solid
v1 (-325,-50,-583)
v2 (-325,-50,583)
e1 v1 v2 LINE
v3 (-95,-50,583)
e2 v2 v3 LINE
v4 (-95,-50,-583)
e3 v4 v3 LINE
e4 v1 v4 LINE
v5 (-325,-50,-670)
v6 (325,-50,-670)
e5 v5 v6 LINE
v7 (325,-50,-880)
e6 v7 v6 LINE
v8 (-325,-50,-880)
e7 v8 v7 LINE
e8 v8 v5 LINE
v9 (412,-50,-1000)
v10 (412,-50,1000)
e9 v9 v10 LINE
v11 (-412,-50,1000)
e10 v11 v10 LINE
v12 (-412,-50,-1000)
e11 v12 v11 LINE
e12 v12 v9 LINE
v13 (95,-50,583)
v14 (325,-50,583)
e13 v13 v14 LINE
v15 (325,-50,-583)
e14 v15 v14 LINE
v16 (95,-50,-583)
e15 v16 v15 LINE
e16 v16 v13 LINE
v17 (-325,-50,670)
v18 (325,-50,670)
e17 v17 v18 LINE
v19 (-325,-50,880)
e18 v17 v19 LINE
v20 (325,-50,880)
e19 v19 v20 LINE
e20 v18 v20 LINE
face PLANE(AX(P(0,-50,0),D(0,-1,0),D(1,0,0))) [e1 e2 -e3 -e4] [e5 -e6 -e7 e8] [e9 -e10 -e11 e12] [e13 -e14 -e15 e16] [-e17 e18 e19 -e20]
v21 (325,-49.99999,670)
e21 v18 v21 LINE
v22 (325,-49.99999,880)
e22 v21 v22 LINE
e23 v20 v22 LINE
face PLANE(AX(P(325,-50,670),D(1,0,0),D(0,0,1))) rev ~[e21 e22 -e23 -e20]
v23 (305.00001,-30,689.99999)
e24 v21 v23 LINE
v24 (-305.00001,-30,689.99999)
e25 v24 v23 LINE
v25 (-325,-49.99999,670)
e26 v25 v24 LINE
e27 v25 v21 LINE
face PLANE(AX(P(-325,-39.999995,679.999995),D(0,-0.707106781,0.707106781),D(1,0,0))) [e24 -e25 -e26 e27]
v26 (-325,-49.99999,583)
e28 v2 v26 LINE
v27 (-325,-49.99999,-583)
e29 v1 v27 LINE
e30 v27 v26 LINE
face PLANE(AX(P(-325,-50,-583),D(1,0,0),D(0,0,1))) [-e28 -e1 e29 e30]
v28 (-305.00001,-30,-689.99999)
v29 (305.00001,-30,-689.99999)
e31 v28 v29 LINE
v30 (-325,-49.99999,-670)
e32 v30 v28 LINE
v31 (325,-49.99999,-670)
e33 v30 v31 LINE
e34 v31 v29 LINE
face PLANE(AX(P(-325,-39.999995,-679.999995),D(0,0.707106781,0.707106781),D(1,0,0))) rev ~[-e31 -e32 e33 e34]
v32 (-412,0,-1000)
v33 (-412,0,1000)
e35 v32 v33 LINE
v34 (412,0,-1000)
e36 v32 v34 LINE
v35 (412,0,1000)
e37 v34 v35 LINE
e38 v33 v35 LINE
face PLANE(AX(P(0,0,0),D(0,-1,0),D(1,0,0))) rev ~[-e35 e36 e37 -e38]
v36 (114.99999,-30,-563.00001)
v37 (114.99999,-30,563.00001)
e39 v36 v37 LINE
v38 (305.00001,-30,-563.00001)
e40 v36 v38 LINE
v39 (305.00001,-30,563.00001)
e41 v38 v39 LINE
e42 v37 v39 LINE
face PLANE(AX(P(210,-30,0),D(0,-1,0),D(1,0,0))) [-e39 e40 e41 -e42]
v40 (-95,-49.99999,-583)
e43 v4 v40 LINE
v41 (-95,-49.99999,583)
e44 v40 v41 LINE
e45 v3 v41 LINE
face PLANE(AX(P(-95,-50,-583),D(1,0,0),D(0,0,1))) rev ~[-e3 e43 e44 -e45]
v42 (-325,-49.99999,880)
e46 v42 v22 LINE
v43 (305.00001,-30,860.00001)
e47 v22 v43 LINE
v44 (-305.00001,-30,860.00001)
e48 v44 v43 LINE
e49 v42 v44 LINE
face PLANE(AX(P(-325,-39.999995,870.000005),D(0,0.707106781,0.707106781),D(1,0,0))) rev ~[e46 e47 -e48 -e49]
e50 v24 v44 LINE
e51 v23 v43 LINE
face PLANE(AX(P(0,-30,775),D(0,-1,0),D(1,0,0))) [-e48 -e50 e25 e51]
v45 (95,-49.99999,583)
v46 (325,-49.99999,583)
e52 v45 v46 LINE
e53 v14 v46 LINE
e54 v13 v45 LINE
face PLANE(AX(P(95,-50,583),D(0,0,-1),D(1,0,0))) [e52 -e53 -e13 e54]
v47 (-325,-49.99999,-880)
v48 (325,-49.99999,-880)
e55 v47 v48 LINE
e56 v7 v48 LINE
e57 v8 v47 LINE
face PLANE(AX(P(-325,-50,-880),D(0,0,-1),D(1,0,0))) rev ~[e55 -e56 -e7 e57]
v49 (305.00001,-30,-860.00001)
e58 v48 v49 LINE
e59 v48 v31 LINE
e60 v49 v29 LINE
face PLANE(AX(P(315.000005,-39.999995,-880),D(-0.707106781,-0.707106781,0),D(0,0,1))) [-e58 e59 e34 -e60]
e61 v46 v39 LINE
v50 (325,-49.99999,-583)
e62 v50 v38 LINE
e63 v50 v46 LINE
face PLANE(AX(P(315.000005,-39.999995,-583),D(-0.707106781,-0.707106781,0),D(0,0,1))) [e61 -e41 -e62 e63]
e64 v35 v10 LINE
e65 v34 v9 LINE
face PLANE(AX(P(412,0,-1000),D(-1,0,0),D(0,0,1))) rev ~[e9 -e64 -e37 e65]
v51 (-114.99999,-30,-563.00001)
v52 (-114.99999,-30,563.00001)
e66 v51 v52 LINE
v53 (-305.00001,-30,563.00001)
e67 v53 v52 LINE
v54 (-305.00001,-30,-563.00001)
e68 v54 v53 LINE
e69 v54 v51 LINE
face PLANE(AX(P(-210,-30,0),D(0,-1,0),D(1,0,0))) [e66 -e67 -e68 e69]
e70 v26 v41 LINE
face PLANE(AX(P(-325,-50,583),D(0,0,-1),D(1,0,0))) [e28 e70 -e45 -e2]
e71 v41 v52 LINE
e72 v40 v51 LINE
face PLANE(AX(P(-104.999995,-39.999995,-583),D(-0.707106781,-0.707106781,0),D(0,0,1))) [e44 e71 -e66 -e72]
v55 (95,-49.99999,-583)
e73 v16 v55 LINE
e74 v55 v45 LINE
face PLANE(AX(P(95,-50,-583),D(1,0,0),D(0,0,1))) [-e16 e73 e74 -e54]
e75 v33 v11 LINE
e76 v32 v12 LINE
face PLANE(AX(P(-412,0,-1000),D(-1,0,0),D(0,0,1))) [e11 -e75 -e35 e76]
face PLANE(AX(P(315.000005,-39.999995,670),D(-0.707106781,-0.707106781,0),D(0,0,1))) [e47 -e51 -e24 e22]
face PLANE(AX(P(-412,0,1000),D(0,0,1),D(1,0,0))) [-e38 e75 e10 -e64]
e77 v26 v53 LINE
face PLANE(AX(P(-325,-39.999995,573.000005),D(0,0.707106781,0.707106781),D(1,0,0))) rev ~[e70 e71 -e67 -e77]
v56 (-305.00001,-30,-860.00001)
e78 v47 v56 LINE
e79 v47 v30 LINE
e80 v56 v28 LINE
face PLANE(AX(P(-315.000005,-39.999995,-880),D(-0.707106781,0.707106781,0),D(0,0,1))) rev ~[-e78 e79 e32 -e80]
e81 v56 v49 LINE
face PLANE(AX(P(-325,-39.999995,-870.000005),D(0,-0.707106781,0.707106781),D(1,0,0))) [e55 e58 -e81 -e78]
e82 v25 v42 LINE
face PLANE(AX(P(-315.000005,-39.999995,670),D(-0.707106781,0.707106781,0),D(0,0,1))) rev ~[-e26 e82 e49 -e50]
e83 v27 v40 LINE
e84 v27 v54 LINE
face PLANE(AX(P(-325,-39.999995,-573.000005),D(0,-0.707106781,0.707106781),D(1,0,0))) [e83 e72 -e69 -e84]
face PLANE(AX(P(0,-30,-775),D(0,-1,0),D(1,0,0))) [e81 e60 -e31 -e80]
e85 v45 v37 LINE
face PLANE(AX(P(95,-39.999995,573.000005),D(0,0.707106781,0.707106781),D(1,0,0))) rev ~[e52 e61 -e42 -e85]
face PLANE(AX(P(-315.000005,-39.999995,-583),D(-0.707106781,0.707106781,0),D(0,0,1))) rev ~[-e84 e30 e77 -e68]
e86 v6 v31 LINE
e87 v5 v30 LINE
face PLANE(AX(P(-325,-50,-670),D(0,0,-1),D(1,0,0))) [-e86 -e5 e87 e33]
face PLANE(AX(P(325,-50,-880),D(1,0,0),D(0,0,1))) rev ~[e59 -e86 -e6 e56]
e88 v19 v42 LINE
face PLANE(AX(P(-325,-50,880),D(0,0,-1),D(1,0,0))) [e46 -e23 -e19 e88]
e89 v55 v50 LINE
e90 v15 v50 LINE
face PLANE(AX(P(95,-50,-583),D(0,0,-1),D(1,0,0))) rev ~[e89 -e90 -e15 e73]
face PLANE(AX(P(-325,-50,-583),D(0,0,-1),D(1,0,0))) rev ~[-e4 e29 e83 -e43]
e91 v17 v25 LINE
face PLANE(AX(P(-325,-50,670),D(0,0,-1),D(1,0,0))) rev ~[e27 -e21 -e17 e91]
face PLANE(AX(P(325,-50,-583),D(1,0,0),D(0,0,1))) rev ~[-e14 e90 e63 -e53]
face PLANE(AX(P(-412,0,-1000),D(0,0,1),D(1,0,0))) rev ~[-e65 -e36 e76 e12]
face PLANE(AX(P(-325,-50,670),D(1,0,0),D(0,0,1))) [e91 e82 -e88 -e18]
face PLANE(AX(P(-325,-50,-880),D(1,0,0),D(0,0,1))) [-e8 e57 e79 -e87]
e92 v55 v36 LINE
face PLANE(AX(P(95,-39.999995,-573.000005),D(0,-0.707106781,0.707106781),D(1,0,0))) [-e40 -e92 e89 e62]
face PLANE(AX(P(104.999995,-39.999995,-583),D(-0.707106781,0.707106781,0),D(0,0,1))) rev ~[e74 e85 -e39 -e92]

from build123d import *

# Parameters (mm, degrees)
F0_W     = 824
F0_H     = 2000
F1_DEPTH = 50
F2_W     = 650
F2_H     = 210
F2_W_2   = 230
F2_H_2   = 1166
F3_DEPTH = 20
F4_SIZE  = 19.99999


# Not quite as in the source:
# - a fillet or chamfer is up to 0.001 mm smaller than in the source, because OpenCascade refuses the exact size


with BuildPart() as f1:
    # F0 (on Front) → F1 (new body)
    with BuildSketch(Plane.XZ):
        Rectangle(F0_W, F0_H)
    extrude(amount=F1_DEPTH)

    # F2 (on face) → F3 (cut)
    with BuildSketch(Plane.XZ.offset(50)):
        with Locations((0, 775)):
            Rectangle(F2_W, F2_H)
        with Locations((-210, 0)):
            Rectangle(F2_W_2, F2_H_2)
        with Locations((210, 0)):
            Rectangle(F2_W_2, F2_H_2)
        with Locations((0, -775)):
            Rectangle(F2_W, F2_H)
    extrude(amount=-F3_DEPTH, mode=Mode.SUBTRACT)

    # F4 (size 20 in the source; OpenCascade refuses exactly that, so slightly less here)
    f4_edges = [f1.edges().sort_by_distance(p)[0] for p in [
        (-95, -30, 0),
        (-210, -30, 583),
        (-325, -30, 0),
        (-210, -30, -583),
        (210, -30, -583),
        (95, -30, 0),
        (325, -30, 0),
        (210, -30, 583),
        (0, -30, 880),
        (-325, -30, 775),
        (325, -30, 775),
        (0, -30, 670),
        (-325, -30, -775),
        (0, -30, -880),
        (325, -30, -775),
        (0, -30, -670),
    ]]
    chamfer(f4_edges, length=F4_SIZE)


solid = f1.part
